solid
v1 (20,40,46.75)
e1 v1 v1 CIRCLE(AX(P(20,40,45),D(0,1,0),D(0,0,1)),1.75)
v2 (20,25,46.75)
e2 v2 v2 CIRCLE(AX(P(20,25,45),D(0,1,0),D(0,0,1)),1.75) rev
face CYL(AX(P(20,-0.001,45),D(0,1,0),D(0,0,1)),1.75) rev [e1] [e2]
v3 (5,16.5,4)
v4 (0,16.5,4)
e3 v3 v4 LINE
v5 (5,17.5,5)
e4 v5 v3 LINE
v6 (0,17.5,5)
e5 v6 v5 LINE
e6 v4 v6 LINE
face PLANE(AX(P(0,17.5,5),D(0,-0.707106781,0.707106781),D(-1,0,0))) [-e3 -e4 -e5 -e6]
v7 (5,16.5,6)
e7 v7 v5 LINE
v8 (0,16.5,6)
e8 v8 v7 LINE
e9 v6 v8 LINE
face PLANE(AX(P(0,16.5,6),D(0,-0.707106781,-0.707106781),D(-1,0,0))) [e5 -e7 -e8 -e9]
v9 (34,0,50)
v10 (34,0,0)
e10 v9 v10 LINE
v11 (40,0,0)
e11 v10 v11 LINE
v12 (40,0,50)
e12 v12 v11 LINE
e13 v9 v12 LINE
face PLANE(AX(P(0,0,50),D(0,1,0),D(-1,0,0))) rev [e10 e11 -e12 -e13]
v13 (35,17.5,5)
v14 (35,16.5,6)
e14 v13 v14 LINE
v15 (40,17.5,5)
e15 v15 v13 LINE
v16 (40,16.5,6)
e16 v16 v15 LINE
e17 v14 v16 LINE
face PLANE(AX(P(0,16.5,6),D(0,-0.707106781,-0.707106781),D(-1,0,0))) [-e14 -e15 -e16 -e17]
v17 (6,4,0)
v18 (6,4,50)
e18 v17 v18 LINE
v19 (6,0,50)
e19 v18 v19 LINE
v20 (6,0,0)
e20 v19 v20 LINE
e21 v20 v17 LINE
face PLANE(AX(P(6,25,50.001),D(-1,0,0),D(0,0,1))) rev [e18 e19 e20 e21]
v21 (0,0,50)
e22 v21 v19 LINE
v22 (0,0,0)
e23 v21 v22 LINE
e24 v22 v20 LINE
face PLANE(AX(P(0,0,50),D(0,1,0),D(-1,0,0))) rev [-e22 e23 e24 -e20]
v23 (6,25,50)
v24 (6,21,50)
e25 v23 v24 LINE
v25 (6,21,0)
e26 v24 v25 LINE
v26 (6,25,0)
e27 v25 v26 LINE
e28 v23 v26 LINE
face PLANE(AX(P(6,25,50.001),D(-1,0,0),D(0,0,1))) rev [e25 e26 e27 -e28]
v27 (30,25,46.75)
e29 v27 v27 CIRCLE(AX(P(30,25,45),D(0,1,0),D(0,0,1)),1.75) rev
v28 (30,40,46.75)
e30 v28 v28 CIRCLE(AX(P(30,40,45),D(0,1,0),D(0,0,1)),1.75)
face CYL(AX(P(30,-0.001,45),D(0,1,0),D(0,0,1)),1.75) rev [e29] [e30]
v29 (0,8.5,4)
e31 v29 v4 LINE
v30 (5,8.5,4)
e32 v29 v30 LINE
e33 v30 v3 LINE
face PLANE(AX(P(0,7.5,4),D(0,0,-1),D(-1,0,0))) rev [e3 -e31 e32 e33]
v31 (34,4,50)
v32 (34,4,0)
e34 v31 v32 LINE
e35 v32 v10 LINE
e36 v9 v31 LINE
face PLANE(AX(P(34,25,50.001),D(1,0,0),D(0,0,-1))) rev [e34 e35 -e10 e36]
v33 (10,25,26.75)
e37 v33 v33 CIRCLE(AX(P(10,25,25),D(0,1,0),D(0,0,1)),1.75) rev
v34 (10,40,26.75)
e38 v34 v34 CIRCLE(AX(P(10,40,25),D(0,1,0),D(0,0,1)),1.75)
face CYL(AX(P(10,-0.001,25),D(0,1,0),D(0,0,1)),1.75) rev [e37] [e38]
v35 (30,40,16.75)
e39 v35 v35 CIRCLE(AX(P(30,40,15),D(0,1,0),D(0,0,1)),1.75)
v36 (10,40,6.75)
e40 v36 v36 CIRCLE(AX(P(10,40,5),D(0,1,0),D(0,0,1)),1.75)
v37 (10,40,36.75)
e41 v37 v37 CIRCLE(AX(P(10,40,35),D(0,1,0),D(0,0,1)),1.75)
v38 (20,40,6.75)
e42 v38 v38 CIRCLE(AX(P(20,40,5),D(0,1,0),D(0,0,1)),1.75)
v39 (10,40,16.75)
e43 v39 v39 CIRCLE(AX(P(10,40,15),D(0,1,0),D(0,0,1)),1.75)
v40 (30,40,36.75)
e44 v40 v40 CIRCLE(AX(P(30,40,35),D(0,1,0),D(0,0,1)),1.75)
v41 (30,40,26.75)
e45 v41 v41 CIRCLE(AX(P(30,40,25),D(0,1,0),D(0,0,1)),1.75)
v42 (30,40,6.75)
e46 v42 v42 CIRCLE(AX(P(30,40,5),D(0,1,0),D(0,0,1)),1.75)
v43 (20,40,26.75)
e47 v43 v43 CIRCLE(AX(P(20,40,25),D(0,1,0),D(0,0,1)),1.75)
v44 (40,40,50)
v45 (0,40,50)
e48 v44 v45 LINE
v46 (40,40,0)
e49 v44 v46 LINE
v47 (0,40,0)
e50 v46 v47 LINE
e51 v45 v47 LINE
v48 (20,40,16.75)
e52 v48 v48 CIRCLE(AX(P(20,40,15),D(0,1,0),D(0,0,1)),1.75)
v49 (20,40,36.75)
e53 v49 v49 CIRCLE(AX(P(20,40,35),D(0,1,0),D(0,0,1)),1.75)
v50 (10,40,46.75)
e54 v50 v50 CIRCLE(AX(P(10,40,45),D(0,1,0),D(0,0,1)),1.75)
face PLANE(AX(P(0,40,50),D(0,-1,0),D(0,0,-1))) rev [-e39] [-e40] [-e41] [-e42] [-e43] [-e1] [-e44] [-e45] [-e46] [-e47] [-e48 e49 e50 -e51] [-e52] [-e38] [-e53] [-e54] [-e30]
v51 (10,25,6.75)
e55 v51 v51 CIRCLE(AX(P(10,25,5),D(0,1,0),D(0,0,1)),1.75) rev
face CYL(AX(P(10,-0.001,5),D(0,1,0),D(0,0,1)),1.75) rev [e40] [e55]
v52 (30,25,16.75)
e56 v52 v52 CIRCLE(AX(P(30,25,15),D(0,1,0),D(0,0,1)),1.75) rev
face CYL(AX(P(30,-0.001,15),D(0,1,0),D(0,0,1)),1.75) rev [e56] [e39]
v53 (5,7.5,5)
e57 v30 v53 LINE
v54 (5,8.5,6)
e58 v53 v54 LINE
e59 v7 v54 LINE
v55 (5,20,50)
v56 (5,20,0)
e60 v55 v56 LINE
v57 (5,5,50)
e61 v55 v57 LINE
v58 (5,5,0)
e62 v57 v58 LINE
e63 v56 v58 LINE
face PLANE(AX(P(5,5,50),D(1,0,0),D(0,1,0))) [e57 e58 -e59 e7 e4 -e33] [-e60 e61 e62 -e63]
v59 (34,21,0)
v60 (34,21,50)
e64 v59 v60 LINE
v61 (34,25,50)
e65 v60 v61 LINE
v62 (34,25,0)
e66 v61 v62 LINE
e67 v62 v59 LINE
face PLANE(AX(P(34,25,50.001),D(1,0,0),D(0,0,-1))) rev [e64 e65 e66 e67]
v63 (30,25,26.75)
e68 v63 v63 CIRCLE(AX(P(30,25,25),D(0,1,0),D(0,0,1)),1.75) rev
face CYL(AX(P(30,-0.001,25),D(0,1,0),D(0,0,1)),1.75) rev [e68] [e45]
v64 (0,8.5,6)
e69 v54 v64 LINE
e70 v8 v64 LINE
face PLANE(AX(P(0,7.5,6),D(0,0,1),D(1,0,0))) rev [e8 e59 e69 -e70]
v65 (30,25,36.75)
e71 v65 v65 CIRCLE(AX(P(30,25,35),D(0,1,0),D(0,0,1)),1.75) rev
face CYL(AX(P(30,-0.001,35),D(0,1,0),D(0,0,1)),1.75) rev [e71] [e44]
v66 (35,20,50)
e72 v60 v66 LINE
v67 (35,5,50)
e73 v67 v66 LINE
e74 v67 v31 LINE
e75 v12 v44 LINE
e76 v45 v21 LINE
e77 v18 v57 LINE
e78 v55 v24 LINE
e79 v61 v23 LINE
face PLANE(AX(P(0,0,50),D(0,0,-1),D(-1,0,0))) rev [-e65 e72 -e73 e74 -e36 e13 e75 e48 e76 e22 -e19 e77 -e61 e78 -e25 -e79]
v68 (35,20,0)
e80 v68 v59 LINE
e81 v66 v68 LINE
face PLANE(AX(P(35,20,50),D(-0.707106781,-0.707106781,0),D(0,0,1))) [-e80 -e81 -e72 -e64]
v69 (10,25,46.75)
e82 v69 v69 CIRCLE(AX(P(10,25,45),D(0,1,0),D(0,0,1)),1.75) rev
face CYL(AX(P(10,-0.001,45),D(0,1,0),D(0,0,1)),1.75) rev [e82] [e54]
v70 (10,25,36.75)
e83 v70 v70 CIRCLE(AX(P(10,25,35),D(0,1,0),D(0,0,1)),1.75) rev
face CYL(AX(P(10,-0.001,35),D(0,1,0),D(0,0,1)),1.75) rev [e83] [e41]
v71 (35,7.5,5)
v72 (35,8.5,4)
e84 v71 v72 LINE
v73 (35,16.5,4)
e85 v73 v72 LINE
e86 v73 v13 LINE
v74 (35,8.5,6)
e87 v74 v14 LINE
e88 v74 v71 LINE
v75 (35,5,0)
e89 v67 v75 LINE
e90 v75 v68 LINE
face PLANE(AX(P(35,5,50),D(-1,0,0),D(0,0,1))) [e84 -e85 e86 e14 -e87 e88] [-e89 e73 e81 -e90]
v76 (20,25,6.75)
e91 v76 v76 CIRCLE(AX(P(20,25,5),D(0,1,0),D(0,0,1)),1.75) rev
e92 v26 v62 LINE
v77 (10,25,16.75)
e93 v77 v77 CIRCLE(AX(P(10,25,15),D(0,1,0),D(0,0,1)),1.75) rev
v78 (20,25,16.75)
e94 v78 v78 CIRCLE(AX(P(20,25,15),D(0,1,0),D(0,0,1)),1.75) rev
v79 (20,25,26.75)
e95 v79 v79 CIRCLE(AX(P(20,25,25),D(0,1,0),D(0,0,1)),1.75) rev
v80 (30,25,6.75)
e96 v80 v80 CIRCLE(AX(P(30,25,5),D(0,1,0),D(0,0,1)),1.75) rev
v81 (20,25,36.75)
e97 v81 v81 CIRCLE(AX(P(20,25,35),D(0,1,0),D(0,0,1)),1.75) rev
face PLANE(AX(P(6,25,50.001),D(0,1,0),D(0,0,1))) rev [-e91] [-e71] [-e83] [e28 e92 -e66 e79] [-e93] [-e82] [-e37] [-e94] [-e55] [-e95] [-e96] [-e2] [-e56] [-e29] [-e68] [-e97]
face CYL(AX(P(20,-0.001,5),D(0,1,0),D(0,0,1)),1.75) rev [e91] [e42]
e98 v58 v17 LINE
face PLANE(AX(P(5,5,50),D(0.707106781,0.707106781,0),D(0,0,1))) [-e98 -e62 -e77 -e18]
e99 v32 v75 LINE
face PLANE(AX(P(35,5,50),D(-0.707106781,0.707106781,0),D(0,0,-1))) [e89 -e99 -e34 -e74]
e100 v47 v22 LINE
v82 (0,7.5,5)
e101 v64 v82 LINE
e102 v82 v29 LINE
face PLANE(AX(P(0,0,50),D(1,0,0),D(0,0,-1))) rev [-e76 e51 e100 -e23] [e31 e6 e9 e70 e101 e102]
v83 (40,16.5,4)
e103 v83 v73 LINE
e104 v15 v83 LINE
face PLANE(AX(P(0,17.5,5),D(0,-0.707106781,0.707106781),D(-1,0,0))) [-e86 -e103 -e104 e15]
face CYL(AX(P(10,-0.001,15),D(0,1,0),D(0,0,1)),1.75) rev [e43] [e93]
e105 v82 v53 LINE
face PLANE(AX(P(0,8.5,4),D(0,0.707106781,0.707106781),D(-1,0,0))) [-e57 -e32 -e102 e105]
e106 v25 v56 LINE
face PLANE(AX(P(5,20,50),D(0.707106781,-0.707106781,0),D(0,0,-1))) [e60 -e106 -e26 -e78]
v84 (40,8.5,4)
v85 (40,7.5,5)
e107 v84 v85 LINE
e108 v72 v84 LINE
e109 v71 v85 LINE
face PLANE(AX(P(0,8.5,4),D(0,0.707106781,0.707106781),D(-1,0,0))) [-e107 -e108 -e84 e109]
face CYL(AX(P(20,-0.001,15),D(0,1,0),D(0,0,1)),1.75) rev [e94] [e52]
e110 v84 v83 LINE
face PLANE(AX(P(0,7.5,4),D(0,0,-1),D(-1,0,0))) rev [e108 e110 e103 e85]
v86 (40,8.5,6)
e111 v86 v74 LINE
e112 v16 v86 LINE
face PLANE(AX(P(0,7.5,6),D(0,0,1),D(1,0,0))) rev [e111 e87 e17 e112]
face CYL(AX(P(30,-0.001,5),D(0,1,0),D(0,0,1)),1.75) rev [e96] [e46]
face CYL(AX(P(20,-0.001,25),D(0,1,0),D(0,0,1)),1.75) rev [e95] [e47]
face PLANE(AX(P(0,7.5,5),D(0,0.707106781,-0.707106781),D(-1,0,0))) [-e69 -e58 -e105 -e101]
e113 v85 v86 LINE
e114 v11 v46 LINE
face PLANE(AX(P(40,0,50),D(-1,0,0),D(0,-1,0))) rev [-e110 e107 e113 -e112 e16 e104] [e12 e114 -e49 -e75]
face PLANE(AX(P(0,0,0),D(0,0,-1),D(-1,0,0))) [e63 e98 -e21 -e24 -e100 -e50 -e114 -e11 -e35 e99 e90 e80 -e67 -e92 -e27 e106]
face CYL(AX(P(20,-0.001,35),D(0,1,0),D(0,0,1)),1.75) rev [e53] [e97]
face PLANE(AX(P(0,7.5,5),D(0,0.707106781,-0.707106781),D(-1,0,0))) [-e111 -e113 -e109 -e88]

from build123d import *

# Parameters (mm, degrees)
SKETCH_1_W          = 40
SKETCH_1_H          = 40
SKETCH_1_W_2        = 30
SKETCH_1_H_2        = 15
EXTRUDE_1_DEPTH     = 50
CUT_EXTRUDE_START   = -50
SKETCH_3_W          = 28
SKETCH_3_H          = 25
CUT_EXTRUDE_1_DEPTH = 50
CHAMFER_1_SIZE      = 1
CUT_EXTRUDE_2_REACH = 77.498
SKETCH_4_R          = 1.75
SKETCH_5_W          = 2
SKETCH_5_H          = 10
CUT_EXTRUDE_4_DEPTH = 76.498344353
CHAMFER_3_SIZE      = 1


with BuildPart() as part:
    # ｽｹｯﾁ1 → ﾎﾞｽ - 押し出し1 (new body)
    with BuildSketch(Plane.XY):
        with Locations((20, 20)):
            Rectangle(SKETCH_1_W, SKETCH_1_H)
        with Locations((20, 12.5)):
            Rectangle(SKETCH_1_W_2, SKETCH_1_H_2, mode=Mode.SUBTRACT)
    extrude(amount=EXTRUDE_1_DEPTH)

    # ｽｹｯﾁ3 → ｶｯﾄ - 押し出し1 (cut)
    with BuildSketch(Plane(origin=(0, 0, 0), x_dir=(-1, 0, 0), z_dir=(0, 0, -1)).offset(CUT_EXTRUDE_START)):
        with Locations((-20, 12.5)):
            Rectangle(SKETCH_3_W, SKETCH_3_H)
    extrude(amount=CUT_EXTRUDE_1_DEPTH, mode=Mode.SUBTRACT)

    # 面取り1
    chamfer_1_edges = [part.edges().sort_by_distance(p)[0] for p in [
        (6, 20, 25),
        (6, 5, 25),
        (34, 5, 25),
        (34, 20, 25),
    ]]
    chamfer(chamfer_1_edges, length=CHAMFER_1_SIZE - 0.0001)  # a hair under: the kernel refuses the full size

    # ｽｹｯﾁ4 → ｶｯﾄ - 押し出し2 (cut, up to next)
    with BuildSketch(Plane(origin=(0, 40, 0), x_dir=(1, 0, 0), z_dir=(0, 1, 0)), mode=Mode.PRIVATE) as cut_extrude_2_sk1:
        with Locations(Location((10, -5, 0), (0, 0, 270))):
            Circle(SKETCH_4_R)
    cut_extrude_2_tool1 = extrude(cut_extrude_2_sk1.sketch, amount=-CUT_EXTRUDE_2_REACH, mode=Mode.PRIVATE) & part.part
    # ｽｹｯﾁ4 → ｶｯﾄ - 押し出し2 (cut, up to next)
    with BuildSketch(Plane(origin=(0, 40, 0), x_dir=(1, 0, 0), z_dir=(0, 1, 0)), mode=Mode.PRIVATE) as cut_extrude_2_sk2:
        with Locations(Location((20, -5, 0), (0, 0, 270))):
            Circle(SKETCH_4_R)
    cut_extrude_2_tool2 = extrude(cut_extrude_2_sk2.sketch, amount=-CUT_EXTRUDE_2_REACH, mode=Mode.PRIVATE) & part.part
    # ｽｹｯﾁ4 → ｶｯﾄ - 押し出し2 (cut, up to next)
    with BuildSketch(Plane(origin=(0, 40, 0), x_dir=(1, 0, 0), z_dir=(0, 1, 0)), mode=Mode.PRIVATE) as cut_extrude_2_sk3:
        with Locations(Location((30, -5, 0), (0, 0, 270))):
            Circle(SKETCH_4_R)
    cut_extrude_2_tool3 = extrude(cut_extrude_2_sk3.sketch, amount=-CUT_EXTRUDE_2_REACH, mode=Mode.PRIVATE) & part.part
    # ｽｹｯﾁ4 → ｶｯﾄ - 押し出し2 (cut, up to next)
    with BuildSketch(Plane(origin=(0, 40, 0), x_dir=(1, 0, 0), z_dir=(0, 1, 0)), mode=Mode.PRIVATE) as cut_extrude_2_sk4:
        with Locations(Location((10, -15, 0), (0, 0, 270))):
            Circle(SKETCH_4_R)
    cut_extrude_2_tool4 = extrude(cut_extrude_2_sk4.sketch, amount=-CUT_EXTRUDE_2_REACH, mode=Mode.PRIVATE) & part.part
    # ｽｹｯﾁ4 → ｶｯﾄ - 押し出し2 (cut, up to next)
    with BuildSketch(Plane(origin=(0, 40, 0), x_dir=(1, 0, 0), z_dir=(0, 1, 0)), mode=Mode.PRIVATE) as cut_extrude_2_sk5:
        with Locations(Location((20, -15, 0), (0, 0, 270))):
            Circle(SKETCH_4_R)
    cut_extrude_2_tool5 = extrude(cut_extrude_2_sk5.sketch, amount=-CUT_EXTRUDE_2_REACH, mode=Mode.PRIVATE) & part.part
    # ｽｹｯﾁ4 → ｶｯﾄ - 押し出し2 (cut, up to next)
    with BuildSketch(Plane(origin=(0, 40, 0), x_dir=(1, 0, 0), z_dir=(0, 1, 0)), mode=Mode.PRIVATE) as cut_extrude_2_sk6:
        with Locations(Location((30, -15, 0), (0, 0, 270))):
            Circle(SKETCH_4_R)
    cut_extrude_2_tool6 = extrude(cut_extrude_2_sk6.sketch, amount=-CUT_EXTRUDE_2_REACH, mode=Mode.PRIVATE) & part.part
    # ｽｹｯﾁ4 → ｶｯﾄ - 押し出し2 (cut, up to next)
    with BuildSketch(Plane(origin=(0, 40, 0), x_dir=(1, 0, 0), z_dir=(0, 1, 0)), mode=Mode.PRIVATE) as cut_extrude_2_sk7:
        with Locations(Location((10, -25, 0), (0, 0, 270))):
            Circle(SKETCH_4_R)
    cut_extrude_2_tool7 = extrude(cut_extrude_2_sk7.sketch, amount=-CUT_EXTRUDE_2_REACH, mode=Mode.PRIVATE) & part.part
    # ｽｹｯﾁ4 → ｶｯﾄ - 押し出し2 (cut, up to next)
    with BuildSketch(Plane(origin=(0, 40, 0), x_dir=(1, 0, 0), z_dir=(0, 1, 0)), mode=Mode.PRIVATE) as cut_extrude_2_sk8:
        with Locations(Location((20, -25, 0), (0, 0, 270))):
            Circle(SKETCH_4_R)
    cut_extrude_2_tool8 = extrude(cut_extrude_2_sk8.sketch, amount=-CUT_EXTRUDE_2_REACH, mode=Mode.PRIVATE) & part.part
    # ｽｹｯﾁ4 → ｶｯﾄ - 押し出し2 (cut, up to next)
    with BuildSketch(Plane(origin=(0, 40, 0), x_dir=(1, 0, 0), z_dir=(0, 1, 0)), mode=Mode.PRIVATE) as cut_extrude_2_sk9:
        with Locations(Location((30, -25, 0), (0, 0, 270))):
            Circle(SKETCH_4_R)
    cut_extrude_2_tool9 = extrude(cut_extrude_2_sk9.sketch, amount=-CUT_EXTRUDE_2_REACH, mode=Mode.PRIVATE) & part.part
    # ｽｹｯﾁ4 → ｶｯﾄ - 押し出し2 (cut, up to next)
    with BuildSketch(Plane(origin=(0, 40, 0), x_dir=(1, 0, 0), z_dir=(0, 1, 0)), mode=Mode.PRIVATE) as cut_extrude_2_sk10:
        with Locations(Location((10, -35, 0), (0, 0, 270))):
            Circle(SKETCH_4_R)
    cut_extrude_2_tool10 = extrude(cut_extrude_2_sk10.sketch, amount=-CUT_EXTRUDE_2_REACH, mode=Mode.PRIVATE) & part.part
    # ｽｹｯﾁ4 → ｶｯﾄ - 押し出し2 (cut, up to next)
    with BuildSketch(Plane(origin=(0, 40, 0), x_dir=(1, 0, 0), z_dir=(0, 1, 0)), mode=Mode.PRIVATE) as cut_extrude_2_sk11:
        with Locations(Location((20, -35, 0), (0, 0, 270))):
            Circle(SKETCH_4_R)
    cut_extrude_2_tool11 = extrude(cut_extrude_2_sk11.sketch, amount=-CUT_EXTRUDE_2_REACH, mode=Mode.PRIVATE) & part.part
    # ｽｹｯﾁ4 → ｶｯﾄ - 押し出し2 (cut, up to next)
    with BuildSketch(Plane(origin=(0, 40, 0), x_dir=(1, 0, 0), z_dir=(0, 1, 0)), mode=Mode.PRIVATE) as cut_extrude_2_sk12:
        with Locations(Location((30, -35, 0), (0, 0, 270))):
            Circle(SKETCH_4_R)
    cut_extrude_2_tool12 = extrude(cut_extrude_2_sk12.sketch, amount=-CUT_EXTRUDE_2_REACH, mode=Mode.PRIVATE) & part.part
    # ｽｹｯﾁ4 → ｶｯﾄ - 押し出し2 (cut, up to next)
    with BuildSketch(Plane(origin=(0, 40, 0), x_dir=(1, 0, 0), z_dir=(0, 1, 0)), mode=Mode.PRIVATE) as cut_extrude_2_sk13:
        with Locations(Location((10, -45, 0), (0, 0, 270))):
            Circle(SKETCH_4_R)
    cut_extrude_2_tool13 = extrude(cut_extrude_2_sk13.sketch, amount=-CUT_EXTRUDE_2_REACH, mode=Mode.PRIVATE) & part.part
    # ｽｹｯﾁ4 → ｶｯﾄ - 押し出し2 (cut, up to next)
    with BuildSketch(Plane(origin=(0, 40, 0), x_dir=(1, 0, 0), z_dir=(0, 1, 0)), mode=Mode.PRIVATE) as cut_extrude_2_sk14:
        with Locations(Location((20, -45, 0), (0, 0, 270))):
            Circle(SKETCH_4_R)
    cut_extrude_2_tool14 = extrude(cut_extrude_2_sk14.sketch, amount=-CUT_EXTRUDE_2_REACH, mode=Mode.PRIVATE) & part.part
    # ｽｹｯﾁ4 → ｶｯﾄ - 押し出し2 (cut, up to next)
    with BuildSketch(Plane(origin=(0, 40, 0), x_dir=(1, 0, 0), z_dir=(0, 1, 0)), mode=Mode.PRIVATE) as cut_extrude_2_sk15:
        with Locations(Location((30, -45, 0), (0, 0, 270))):
            Circle(SKETCH_4_R)
    cut_extrude_2_tool15 = extrude(cut_extrude_2_sk15.sketch, amount=-CUT_EXTRUDE_2_REACH, mode=Mode.PRIVATE) & part.part
    add(cut_extrude_2_tool1.solids().sort_by_distance((10, 40, 5))[0], mode=Mode.SUBTRACT)
    add(cut_extrude_2_tool2.solids().sort_by_distance((20, 40, 5))[0], mode=Mode.SUBTRACT)
    add(cut_extrude_2_tool3.solids().sort_by_distance((30, 40, 5))[0], mode=Mode.SUBTRACT)
    add(cut_extrude_2_tool4.solids().sort_by_distance((10, 40, 15))[0], mode=Mode.SUBTRACT)
    add(cut_extrude_2_tool5.solids().sort_by_distance((20, 40, 15))[0], mode=Mode.SUBTRACT)
    add(cut_extrude_2_tool6.solids().sort_by_distance((30, 40, 15))[0], mode=Mode.SUBTRACT)
    add(cut_extrude_2_tool7.solids().sort_by_distance((10, 40, 25))[0], mode=Mode.SUBTRACT)
    add(cut_extrude_2_tool8.solids().sort_by_distance((20, 40, 25))[0], mode=Mode.SUBTRACT)
    add(cut_extrude_2_tool9.solids().sort_by_distance((30, 40, 25))[0], mode=Mode.SUBTRACT)
    add(cut_extrude_2_tool10.solids().sort_by_distance((10, 40, 35))[0], mode=Mode.SUBTRACT)
    add(cut_extrude_2_tool11.solids().sort_by_distance((20, 40, 35))[0], mode=Mode.SUBTRACT)
    add(cut_extrude_2_tool12.solids().sort_by_distance((30, 40, 35))[0], mode=Mode.SUBTRACT)
    add(cut_extrude_2_tool13.solids().sort_by_distance((10, 40, 45))[0], mode=Mode.SUBTRACT)
    add(cut_extrude_2_tool14.solids().sort_by_distance((20, 40, 45))[0], mode=Mode.SUBTRACT)
    add(cut_extrude_2_tool15.solids().sort_by_distance((30, 40, 45))[0], mode=Mode.SUBTRACT)

    # ｽｹｯﾁ5 → ｶｯﾄ - 押し出し4 (cut, through all)
    with BuildSketch(Plane(origin=(40, 0, 0), x_dir=(0, 0, -1), z_dir=(1, 0, 0))):
        with Locations((-5, 12.5)):
            Rectangle(SKETCH_5_W, SKETCH_5_H)
    extrude(amount=-CUT_EXTRUDE_4_DEPTH, mode=Mode.SUBTRACT)

    # 面取り3
    chamfer_3_edges = [part.edges().sort_by_distance(p)[0] for p in [
        (2.5, 17.5, 6),
        (2.5, 17.5, 4),
        (2.5, 7.5, 4),
        (2.5, 7.5, 6),
        (37.5, 7.5, 4),
        (37.5, 7.5, 6),
        (37.5, 17.5, 4),
        (37.5, 17.5, 6),
    ]]
    chamfer(chamfer_3_edges, length=CHAMFER_3_SIZE - 0.0001)  # a hair under: the kernel refuses the full size


solid = part.part
